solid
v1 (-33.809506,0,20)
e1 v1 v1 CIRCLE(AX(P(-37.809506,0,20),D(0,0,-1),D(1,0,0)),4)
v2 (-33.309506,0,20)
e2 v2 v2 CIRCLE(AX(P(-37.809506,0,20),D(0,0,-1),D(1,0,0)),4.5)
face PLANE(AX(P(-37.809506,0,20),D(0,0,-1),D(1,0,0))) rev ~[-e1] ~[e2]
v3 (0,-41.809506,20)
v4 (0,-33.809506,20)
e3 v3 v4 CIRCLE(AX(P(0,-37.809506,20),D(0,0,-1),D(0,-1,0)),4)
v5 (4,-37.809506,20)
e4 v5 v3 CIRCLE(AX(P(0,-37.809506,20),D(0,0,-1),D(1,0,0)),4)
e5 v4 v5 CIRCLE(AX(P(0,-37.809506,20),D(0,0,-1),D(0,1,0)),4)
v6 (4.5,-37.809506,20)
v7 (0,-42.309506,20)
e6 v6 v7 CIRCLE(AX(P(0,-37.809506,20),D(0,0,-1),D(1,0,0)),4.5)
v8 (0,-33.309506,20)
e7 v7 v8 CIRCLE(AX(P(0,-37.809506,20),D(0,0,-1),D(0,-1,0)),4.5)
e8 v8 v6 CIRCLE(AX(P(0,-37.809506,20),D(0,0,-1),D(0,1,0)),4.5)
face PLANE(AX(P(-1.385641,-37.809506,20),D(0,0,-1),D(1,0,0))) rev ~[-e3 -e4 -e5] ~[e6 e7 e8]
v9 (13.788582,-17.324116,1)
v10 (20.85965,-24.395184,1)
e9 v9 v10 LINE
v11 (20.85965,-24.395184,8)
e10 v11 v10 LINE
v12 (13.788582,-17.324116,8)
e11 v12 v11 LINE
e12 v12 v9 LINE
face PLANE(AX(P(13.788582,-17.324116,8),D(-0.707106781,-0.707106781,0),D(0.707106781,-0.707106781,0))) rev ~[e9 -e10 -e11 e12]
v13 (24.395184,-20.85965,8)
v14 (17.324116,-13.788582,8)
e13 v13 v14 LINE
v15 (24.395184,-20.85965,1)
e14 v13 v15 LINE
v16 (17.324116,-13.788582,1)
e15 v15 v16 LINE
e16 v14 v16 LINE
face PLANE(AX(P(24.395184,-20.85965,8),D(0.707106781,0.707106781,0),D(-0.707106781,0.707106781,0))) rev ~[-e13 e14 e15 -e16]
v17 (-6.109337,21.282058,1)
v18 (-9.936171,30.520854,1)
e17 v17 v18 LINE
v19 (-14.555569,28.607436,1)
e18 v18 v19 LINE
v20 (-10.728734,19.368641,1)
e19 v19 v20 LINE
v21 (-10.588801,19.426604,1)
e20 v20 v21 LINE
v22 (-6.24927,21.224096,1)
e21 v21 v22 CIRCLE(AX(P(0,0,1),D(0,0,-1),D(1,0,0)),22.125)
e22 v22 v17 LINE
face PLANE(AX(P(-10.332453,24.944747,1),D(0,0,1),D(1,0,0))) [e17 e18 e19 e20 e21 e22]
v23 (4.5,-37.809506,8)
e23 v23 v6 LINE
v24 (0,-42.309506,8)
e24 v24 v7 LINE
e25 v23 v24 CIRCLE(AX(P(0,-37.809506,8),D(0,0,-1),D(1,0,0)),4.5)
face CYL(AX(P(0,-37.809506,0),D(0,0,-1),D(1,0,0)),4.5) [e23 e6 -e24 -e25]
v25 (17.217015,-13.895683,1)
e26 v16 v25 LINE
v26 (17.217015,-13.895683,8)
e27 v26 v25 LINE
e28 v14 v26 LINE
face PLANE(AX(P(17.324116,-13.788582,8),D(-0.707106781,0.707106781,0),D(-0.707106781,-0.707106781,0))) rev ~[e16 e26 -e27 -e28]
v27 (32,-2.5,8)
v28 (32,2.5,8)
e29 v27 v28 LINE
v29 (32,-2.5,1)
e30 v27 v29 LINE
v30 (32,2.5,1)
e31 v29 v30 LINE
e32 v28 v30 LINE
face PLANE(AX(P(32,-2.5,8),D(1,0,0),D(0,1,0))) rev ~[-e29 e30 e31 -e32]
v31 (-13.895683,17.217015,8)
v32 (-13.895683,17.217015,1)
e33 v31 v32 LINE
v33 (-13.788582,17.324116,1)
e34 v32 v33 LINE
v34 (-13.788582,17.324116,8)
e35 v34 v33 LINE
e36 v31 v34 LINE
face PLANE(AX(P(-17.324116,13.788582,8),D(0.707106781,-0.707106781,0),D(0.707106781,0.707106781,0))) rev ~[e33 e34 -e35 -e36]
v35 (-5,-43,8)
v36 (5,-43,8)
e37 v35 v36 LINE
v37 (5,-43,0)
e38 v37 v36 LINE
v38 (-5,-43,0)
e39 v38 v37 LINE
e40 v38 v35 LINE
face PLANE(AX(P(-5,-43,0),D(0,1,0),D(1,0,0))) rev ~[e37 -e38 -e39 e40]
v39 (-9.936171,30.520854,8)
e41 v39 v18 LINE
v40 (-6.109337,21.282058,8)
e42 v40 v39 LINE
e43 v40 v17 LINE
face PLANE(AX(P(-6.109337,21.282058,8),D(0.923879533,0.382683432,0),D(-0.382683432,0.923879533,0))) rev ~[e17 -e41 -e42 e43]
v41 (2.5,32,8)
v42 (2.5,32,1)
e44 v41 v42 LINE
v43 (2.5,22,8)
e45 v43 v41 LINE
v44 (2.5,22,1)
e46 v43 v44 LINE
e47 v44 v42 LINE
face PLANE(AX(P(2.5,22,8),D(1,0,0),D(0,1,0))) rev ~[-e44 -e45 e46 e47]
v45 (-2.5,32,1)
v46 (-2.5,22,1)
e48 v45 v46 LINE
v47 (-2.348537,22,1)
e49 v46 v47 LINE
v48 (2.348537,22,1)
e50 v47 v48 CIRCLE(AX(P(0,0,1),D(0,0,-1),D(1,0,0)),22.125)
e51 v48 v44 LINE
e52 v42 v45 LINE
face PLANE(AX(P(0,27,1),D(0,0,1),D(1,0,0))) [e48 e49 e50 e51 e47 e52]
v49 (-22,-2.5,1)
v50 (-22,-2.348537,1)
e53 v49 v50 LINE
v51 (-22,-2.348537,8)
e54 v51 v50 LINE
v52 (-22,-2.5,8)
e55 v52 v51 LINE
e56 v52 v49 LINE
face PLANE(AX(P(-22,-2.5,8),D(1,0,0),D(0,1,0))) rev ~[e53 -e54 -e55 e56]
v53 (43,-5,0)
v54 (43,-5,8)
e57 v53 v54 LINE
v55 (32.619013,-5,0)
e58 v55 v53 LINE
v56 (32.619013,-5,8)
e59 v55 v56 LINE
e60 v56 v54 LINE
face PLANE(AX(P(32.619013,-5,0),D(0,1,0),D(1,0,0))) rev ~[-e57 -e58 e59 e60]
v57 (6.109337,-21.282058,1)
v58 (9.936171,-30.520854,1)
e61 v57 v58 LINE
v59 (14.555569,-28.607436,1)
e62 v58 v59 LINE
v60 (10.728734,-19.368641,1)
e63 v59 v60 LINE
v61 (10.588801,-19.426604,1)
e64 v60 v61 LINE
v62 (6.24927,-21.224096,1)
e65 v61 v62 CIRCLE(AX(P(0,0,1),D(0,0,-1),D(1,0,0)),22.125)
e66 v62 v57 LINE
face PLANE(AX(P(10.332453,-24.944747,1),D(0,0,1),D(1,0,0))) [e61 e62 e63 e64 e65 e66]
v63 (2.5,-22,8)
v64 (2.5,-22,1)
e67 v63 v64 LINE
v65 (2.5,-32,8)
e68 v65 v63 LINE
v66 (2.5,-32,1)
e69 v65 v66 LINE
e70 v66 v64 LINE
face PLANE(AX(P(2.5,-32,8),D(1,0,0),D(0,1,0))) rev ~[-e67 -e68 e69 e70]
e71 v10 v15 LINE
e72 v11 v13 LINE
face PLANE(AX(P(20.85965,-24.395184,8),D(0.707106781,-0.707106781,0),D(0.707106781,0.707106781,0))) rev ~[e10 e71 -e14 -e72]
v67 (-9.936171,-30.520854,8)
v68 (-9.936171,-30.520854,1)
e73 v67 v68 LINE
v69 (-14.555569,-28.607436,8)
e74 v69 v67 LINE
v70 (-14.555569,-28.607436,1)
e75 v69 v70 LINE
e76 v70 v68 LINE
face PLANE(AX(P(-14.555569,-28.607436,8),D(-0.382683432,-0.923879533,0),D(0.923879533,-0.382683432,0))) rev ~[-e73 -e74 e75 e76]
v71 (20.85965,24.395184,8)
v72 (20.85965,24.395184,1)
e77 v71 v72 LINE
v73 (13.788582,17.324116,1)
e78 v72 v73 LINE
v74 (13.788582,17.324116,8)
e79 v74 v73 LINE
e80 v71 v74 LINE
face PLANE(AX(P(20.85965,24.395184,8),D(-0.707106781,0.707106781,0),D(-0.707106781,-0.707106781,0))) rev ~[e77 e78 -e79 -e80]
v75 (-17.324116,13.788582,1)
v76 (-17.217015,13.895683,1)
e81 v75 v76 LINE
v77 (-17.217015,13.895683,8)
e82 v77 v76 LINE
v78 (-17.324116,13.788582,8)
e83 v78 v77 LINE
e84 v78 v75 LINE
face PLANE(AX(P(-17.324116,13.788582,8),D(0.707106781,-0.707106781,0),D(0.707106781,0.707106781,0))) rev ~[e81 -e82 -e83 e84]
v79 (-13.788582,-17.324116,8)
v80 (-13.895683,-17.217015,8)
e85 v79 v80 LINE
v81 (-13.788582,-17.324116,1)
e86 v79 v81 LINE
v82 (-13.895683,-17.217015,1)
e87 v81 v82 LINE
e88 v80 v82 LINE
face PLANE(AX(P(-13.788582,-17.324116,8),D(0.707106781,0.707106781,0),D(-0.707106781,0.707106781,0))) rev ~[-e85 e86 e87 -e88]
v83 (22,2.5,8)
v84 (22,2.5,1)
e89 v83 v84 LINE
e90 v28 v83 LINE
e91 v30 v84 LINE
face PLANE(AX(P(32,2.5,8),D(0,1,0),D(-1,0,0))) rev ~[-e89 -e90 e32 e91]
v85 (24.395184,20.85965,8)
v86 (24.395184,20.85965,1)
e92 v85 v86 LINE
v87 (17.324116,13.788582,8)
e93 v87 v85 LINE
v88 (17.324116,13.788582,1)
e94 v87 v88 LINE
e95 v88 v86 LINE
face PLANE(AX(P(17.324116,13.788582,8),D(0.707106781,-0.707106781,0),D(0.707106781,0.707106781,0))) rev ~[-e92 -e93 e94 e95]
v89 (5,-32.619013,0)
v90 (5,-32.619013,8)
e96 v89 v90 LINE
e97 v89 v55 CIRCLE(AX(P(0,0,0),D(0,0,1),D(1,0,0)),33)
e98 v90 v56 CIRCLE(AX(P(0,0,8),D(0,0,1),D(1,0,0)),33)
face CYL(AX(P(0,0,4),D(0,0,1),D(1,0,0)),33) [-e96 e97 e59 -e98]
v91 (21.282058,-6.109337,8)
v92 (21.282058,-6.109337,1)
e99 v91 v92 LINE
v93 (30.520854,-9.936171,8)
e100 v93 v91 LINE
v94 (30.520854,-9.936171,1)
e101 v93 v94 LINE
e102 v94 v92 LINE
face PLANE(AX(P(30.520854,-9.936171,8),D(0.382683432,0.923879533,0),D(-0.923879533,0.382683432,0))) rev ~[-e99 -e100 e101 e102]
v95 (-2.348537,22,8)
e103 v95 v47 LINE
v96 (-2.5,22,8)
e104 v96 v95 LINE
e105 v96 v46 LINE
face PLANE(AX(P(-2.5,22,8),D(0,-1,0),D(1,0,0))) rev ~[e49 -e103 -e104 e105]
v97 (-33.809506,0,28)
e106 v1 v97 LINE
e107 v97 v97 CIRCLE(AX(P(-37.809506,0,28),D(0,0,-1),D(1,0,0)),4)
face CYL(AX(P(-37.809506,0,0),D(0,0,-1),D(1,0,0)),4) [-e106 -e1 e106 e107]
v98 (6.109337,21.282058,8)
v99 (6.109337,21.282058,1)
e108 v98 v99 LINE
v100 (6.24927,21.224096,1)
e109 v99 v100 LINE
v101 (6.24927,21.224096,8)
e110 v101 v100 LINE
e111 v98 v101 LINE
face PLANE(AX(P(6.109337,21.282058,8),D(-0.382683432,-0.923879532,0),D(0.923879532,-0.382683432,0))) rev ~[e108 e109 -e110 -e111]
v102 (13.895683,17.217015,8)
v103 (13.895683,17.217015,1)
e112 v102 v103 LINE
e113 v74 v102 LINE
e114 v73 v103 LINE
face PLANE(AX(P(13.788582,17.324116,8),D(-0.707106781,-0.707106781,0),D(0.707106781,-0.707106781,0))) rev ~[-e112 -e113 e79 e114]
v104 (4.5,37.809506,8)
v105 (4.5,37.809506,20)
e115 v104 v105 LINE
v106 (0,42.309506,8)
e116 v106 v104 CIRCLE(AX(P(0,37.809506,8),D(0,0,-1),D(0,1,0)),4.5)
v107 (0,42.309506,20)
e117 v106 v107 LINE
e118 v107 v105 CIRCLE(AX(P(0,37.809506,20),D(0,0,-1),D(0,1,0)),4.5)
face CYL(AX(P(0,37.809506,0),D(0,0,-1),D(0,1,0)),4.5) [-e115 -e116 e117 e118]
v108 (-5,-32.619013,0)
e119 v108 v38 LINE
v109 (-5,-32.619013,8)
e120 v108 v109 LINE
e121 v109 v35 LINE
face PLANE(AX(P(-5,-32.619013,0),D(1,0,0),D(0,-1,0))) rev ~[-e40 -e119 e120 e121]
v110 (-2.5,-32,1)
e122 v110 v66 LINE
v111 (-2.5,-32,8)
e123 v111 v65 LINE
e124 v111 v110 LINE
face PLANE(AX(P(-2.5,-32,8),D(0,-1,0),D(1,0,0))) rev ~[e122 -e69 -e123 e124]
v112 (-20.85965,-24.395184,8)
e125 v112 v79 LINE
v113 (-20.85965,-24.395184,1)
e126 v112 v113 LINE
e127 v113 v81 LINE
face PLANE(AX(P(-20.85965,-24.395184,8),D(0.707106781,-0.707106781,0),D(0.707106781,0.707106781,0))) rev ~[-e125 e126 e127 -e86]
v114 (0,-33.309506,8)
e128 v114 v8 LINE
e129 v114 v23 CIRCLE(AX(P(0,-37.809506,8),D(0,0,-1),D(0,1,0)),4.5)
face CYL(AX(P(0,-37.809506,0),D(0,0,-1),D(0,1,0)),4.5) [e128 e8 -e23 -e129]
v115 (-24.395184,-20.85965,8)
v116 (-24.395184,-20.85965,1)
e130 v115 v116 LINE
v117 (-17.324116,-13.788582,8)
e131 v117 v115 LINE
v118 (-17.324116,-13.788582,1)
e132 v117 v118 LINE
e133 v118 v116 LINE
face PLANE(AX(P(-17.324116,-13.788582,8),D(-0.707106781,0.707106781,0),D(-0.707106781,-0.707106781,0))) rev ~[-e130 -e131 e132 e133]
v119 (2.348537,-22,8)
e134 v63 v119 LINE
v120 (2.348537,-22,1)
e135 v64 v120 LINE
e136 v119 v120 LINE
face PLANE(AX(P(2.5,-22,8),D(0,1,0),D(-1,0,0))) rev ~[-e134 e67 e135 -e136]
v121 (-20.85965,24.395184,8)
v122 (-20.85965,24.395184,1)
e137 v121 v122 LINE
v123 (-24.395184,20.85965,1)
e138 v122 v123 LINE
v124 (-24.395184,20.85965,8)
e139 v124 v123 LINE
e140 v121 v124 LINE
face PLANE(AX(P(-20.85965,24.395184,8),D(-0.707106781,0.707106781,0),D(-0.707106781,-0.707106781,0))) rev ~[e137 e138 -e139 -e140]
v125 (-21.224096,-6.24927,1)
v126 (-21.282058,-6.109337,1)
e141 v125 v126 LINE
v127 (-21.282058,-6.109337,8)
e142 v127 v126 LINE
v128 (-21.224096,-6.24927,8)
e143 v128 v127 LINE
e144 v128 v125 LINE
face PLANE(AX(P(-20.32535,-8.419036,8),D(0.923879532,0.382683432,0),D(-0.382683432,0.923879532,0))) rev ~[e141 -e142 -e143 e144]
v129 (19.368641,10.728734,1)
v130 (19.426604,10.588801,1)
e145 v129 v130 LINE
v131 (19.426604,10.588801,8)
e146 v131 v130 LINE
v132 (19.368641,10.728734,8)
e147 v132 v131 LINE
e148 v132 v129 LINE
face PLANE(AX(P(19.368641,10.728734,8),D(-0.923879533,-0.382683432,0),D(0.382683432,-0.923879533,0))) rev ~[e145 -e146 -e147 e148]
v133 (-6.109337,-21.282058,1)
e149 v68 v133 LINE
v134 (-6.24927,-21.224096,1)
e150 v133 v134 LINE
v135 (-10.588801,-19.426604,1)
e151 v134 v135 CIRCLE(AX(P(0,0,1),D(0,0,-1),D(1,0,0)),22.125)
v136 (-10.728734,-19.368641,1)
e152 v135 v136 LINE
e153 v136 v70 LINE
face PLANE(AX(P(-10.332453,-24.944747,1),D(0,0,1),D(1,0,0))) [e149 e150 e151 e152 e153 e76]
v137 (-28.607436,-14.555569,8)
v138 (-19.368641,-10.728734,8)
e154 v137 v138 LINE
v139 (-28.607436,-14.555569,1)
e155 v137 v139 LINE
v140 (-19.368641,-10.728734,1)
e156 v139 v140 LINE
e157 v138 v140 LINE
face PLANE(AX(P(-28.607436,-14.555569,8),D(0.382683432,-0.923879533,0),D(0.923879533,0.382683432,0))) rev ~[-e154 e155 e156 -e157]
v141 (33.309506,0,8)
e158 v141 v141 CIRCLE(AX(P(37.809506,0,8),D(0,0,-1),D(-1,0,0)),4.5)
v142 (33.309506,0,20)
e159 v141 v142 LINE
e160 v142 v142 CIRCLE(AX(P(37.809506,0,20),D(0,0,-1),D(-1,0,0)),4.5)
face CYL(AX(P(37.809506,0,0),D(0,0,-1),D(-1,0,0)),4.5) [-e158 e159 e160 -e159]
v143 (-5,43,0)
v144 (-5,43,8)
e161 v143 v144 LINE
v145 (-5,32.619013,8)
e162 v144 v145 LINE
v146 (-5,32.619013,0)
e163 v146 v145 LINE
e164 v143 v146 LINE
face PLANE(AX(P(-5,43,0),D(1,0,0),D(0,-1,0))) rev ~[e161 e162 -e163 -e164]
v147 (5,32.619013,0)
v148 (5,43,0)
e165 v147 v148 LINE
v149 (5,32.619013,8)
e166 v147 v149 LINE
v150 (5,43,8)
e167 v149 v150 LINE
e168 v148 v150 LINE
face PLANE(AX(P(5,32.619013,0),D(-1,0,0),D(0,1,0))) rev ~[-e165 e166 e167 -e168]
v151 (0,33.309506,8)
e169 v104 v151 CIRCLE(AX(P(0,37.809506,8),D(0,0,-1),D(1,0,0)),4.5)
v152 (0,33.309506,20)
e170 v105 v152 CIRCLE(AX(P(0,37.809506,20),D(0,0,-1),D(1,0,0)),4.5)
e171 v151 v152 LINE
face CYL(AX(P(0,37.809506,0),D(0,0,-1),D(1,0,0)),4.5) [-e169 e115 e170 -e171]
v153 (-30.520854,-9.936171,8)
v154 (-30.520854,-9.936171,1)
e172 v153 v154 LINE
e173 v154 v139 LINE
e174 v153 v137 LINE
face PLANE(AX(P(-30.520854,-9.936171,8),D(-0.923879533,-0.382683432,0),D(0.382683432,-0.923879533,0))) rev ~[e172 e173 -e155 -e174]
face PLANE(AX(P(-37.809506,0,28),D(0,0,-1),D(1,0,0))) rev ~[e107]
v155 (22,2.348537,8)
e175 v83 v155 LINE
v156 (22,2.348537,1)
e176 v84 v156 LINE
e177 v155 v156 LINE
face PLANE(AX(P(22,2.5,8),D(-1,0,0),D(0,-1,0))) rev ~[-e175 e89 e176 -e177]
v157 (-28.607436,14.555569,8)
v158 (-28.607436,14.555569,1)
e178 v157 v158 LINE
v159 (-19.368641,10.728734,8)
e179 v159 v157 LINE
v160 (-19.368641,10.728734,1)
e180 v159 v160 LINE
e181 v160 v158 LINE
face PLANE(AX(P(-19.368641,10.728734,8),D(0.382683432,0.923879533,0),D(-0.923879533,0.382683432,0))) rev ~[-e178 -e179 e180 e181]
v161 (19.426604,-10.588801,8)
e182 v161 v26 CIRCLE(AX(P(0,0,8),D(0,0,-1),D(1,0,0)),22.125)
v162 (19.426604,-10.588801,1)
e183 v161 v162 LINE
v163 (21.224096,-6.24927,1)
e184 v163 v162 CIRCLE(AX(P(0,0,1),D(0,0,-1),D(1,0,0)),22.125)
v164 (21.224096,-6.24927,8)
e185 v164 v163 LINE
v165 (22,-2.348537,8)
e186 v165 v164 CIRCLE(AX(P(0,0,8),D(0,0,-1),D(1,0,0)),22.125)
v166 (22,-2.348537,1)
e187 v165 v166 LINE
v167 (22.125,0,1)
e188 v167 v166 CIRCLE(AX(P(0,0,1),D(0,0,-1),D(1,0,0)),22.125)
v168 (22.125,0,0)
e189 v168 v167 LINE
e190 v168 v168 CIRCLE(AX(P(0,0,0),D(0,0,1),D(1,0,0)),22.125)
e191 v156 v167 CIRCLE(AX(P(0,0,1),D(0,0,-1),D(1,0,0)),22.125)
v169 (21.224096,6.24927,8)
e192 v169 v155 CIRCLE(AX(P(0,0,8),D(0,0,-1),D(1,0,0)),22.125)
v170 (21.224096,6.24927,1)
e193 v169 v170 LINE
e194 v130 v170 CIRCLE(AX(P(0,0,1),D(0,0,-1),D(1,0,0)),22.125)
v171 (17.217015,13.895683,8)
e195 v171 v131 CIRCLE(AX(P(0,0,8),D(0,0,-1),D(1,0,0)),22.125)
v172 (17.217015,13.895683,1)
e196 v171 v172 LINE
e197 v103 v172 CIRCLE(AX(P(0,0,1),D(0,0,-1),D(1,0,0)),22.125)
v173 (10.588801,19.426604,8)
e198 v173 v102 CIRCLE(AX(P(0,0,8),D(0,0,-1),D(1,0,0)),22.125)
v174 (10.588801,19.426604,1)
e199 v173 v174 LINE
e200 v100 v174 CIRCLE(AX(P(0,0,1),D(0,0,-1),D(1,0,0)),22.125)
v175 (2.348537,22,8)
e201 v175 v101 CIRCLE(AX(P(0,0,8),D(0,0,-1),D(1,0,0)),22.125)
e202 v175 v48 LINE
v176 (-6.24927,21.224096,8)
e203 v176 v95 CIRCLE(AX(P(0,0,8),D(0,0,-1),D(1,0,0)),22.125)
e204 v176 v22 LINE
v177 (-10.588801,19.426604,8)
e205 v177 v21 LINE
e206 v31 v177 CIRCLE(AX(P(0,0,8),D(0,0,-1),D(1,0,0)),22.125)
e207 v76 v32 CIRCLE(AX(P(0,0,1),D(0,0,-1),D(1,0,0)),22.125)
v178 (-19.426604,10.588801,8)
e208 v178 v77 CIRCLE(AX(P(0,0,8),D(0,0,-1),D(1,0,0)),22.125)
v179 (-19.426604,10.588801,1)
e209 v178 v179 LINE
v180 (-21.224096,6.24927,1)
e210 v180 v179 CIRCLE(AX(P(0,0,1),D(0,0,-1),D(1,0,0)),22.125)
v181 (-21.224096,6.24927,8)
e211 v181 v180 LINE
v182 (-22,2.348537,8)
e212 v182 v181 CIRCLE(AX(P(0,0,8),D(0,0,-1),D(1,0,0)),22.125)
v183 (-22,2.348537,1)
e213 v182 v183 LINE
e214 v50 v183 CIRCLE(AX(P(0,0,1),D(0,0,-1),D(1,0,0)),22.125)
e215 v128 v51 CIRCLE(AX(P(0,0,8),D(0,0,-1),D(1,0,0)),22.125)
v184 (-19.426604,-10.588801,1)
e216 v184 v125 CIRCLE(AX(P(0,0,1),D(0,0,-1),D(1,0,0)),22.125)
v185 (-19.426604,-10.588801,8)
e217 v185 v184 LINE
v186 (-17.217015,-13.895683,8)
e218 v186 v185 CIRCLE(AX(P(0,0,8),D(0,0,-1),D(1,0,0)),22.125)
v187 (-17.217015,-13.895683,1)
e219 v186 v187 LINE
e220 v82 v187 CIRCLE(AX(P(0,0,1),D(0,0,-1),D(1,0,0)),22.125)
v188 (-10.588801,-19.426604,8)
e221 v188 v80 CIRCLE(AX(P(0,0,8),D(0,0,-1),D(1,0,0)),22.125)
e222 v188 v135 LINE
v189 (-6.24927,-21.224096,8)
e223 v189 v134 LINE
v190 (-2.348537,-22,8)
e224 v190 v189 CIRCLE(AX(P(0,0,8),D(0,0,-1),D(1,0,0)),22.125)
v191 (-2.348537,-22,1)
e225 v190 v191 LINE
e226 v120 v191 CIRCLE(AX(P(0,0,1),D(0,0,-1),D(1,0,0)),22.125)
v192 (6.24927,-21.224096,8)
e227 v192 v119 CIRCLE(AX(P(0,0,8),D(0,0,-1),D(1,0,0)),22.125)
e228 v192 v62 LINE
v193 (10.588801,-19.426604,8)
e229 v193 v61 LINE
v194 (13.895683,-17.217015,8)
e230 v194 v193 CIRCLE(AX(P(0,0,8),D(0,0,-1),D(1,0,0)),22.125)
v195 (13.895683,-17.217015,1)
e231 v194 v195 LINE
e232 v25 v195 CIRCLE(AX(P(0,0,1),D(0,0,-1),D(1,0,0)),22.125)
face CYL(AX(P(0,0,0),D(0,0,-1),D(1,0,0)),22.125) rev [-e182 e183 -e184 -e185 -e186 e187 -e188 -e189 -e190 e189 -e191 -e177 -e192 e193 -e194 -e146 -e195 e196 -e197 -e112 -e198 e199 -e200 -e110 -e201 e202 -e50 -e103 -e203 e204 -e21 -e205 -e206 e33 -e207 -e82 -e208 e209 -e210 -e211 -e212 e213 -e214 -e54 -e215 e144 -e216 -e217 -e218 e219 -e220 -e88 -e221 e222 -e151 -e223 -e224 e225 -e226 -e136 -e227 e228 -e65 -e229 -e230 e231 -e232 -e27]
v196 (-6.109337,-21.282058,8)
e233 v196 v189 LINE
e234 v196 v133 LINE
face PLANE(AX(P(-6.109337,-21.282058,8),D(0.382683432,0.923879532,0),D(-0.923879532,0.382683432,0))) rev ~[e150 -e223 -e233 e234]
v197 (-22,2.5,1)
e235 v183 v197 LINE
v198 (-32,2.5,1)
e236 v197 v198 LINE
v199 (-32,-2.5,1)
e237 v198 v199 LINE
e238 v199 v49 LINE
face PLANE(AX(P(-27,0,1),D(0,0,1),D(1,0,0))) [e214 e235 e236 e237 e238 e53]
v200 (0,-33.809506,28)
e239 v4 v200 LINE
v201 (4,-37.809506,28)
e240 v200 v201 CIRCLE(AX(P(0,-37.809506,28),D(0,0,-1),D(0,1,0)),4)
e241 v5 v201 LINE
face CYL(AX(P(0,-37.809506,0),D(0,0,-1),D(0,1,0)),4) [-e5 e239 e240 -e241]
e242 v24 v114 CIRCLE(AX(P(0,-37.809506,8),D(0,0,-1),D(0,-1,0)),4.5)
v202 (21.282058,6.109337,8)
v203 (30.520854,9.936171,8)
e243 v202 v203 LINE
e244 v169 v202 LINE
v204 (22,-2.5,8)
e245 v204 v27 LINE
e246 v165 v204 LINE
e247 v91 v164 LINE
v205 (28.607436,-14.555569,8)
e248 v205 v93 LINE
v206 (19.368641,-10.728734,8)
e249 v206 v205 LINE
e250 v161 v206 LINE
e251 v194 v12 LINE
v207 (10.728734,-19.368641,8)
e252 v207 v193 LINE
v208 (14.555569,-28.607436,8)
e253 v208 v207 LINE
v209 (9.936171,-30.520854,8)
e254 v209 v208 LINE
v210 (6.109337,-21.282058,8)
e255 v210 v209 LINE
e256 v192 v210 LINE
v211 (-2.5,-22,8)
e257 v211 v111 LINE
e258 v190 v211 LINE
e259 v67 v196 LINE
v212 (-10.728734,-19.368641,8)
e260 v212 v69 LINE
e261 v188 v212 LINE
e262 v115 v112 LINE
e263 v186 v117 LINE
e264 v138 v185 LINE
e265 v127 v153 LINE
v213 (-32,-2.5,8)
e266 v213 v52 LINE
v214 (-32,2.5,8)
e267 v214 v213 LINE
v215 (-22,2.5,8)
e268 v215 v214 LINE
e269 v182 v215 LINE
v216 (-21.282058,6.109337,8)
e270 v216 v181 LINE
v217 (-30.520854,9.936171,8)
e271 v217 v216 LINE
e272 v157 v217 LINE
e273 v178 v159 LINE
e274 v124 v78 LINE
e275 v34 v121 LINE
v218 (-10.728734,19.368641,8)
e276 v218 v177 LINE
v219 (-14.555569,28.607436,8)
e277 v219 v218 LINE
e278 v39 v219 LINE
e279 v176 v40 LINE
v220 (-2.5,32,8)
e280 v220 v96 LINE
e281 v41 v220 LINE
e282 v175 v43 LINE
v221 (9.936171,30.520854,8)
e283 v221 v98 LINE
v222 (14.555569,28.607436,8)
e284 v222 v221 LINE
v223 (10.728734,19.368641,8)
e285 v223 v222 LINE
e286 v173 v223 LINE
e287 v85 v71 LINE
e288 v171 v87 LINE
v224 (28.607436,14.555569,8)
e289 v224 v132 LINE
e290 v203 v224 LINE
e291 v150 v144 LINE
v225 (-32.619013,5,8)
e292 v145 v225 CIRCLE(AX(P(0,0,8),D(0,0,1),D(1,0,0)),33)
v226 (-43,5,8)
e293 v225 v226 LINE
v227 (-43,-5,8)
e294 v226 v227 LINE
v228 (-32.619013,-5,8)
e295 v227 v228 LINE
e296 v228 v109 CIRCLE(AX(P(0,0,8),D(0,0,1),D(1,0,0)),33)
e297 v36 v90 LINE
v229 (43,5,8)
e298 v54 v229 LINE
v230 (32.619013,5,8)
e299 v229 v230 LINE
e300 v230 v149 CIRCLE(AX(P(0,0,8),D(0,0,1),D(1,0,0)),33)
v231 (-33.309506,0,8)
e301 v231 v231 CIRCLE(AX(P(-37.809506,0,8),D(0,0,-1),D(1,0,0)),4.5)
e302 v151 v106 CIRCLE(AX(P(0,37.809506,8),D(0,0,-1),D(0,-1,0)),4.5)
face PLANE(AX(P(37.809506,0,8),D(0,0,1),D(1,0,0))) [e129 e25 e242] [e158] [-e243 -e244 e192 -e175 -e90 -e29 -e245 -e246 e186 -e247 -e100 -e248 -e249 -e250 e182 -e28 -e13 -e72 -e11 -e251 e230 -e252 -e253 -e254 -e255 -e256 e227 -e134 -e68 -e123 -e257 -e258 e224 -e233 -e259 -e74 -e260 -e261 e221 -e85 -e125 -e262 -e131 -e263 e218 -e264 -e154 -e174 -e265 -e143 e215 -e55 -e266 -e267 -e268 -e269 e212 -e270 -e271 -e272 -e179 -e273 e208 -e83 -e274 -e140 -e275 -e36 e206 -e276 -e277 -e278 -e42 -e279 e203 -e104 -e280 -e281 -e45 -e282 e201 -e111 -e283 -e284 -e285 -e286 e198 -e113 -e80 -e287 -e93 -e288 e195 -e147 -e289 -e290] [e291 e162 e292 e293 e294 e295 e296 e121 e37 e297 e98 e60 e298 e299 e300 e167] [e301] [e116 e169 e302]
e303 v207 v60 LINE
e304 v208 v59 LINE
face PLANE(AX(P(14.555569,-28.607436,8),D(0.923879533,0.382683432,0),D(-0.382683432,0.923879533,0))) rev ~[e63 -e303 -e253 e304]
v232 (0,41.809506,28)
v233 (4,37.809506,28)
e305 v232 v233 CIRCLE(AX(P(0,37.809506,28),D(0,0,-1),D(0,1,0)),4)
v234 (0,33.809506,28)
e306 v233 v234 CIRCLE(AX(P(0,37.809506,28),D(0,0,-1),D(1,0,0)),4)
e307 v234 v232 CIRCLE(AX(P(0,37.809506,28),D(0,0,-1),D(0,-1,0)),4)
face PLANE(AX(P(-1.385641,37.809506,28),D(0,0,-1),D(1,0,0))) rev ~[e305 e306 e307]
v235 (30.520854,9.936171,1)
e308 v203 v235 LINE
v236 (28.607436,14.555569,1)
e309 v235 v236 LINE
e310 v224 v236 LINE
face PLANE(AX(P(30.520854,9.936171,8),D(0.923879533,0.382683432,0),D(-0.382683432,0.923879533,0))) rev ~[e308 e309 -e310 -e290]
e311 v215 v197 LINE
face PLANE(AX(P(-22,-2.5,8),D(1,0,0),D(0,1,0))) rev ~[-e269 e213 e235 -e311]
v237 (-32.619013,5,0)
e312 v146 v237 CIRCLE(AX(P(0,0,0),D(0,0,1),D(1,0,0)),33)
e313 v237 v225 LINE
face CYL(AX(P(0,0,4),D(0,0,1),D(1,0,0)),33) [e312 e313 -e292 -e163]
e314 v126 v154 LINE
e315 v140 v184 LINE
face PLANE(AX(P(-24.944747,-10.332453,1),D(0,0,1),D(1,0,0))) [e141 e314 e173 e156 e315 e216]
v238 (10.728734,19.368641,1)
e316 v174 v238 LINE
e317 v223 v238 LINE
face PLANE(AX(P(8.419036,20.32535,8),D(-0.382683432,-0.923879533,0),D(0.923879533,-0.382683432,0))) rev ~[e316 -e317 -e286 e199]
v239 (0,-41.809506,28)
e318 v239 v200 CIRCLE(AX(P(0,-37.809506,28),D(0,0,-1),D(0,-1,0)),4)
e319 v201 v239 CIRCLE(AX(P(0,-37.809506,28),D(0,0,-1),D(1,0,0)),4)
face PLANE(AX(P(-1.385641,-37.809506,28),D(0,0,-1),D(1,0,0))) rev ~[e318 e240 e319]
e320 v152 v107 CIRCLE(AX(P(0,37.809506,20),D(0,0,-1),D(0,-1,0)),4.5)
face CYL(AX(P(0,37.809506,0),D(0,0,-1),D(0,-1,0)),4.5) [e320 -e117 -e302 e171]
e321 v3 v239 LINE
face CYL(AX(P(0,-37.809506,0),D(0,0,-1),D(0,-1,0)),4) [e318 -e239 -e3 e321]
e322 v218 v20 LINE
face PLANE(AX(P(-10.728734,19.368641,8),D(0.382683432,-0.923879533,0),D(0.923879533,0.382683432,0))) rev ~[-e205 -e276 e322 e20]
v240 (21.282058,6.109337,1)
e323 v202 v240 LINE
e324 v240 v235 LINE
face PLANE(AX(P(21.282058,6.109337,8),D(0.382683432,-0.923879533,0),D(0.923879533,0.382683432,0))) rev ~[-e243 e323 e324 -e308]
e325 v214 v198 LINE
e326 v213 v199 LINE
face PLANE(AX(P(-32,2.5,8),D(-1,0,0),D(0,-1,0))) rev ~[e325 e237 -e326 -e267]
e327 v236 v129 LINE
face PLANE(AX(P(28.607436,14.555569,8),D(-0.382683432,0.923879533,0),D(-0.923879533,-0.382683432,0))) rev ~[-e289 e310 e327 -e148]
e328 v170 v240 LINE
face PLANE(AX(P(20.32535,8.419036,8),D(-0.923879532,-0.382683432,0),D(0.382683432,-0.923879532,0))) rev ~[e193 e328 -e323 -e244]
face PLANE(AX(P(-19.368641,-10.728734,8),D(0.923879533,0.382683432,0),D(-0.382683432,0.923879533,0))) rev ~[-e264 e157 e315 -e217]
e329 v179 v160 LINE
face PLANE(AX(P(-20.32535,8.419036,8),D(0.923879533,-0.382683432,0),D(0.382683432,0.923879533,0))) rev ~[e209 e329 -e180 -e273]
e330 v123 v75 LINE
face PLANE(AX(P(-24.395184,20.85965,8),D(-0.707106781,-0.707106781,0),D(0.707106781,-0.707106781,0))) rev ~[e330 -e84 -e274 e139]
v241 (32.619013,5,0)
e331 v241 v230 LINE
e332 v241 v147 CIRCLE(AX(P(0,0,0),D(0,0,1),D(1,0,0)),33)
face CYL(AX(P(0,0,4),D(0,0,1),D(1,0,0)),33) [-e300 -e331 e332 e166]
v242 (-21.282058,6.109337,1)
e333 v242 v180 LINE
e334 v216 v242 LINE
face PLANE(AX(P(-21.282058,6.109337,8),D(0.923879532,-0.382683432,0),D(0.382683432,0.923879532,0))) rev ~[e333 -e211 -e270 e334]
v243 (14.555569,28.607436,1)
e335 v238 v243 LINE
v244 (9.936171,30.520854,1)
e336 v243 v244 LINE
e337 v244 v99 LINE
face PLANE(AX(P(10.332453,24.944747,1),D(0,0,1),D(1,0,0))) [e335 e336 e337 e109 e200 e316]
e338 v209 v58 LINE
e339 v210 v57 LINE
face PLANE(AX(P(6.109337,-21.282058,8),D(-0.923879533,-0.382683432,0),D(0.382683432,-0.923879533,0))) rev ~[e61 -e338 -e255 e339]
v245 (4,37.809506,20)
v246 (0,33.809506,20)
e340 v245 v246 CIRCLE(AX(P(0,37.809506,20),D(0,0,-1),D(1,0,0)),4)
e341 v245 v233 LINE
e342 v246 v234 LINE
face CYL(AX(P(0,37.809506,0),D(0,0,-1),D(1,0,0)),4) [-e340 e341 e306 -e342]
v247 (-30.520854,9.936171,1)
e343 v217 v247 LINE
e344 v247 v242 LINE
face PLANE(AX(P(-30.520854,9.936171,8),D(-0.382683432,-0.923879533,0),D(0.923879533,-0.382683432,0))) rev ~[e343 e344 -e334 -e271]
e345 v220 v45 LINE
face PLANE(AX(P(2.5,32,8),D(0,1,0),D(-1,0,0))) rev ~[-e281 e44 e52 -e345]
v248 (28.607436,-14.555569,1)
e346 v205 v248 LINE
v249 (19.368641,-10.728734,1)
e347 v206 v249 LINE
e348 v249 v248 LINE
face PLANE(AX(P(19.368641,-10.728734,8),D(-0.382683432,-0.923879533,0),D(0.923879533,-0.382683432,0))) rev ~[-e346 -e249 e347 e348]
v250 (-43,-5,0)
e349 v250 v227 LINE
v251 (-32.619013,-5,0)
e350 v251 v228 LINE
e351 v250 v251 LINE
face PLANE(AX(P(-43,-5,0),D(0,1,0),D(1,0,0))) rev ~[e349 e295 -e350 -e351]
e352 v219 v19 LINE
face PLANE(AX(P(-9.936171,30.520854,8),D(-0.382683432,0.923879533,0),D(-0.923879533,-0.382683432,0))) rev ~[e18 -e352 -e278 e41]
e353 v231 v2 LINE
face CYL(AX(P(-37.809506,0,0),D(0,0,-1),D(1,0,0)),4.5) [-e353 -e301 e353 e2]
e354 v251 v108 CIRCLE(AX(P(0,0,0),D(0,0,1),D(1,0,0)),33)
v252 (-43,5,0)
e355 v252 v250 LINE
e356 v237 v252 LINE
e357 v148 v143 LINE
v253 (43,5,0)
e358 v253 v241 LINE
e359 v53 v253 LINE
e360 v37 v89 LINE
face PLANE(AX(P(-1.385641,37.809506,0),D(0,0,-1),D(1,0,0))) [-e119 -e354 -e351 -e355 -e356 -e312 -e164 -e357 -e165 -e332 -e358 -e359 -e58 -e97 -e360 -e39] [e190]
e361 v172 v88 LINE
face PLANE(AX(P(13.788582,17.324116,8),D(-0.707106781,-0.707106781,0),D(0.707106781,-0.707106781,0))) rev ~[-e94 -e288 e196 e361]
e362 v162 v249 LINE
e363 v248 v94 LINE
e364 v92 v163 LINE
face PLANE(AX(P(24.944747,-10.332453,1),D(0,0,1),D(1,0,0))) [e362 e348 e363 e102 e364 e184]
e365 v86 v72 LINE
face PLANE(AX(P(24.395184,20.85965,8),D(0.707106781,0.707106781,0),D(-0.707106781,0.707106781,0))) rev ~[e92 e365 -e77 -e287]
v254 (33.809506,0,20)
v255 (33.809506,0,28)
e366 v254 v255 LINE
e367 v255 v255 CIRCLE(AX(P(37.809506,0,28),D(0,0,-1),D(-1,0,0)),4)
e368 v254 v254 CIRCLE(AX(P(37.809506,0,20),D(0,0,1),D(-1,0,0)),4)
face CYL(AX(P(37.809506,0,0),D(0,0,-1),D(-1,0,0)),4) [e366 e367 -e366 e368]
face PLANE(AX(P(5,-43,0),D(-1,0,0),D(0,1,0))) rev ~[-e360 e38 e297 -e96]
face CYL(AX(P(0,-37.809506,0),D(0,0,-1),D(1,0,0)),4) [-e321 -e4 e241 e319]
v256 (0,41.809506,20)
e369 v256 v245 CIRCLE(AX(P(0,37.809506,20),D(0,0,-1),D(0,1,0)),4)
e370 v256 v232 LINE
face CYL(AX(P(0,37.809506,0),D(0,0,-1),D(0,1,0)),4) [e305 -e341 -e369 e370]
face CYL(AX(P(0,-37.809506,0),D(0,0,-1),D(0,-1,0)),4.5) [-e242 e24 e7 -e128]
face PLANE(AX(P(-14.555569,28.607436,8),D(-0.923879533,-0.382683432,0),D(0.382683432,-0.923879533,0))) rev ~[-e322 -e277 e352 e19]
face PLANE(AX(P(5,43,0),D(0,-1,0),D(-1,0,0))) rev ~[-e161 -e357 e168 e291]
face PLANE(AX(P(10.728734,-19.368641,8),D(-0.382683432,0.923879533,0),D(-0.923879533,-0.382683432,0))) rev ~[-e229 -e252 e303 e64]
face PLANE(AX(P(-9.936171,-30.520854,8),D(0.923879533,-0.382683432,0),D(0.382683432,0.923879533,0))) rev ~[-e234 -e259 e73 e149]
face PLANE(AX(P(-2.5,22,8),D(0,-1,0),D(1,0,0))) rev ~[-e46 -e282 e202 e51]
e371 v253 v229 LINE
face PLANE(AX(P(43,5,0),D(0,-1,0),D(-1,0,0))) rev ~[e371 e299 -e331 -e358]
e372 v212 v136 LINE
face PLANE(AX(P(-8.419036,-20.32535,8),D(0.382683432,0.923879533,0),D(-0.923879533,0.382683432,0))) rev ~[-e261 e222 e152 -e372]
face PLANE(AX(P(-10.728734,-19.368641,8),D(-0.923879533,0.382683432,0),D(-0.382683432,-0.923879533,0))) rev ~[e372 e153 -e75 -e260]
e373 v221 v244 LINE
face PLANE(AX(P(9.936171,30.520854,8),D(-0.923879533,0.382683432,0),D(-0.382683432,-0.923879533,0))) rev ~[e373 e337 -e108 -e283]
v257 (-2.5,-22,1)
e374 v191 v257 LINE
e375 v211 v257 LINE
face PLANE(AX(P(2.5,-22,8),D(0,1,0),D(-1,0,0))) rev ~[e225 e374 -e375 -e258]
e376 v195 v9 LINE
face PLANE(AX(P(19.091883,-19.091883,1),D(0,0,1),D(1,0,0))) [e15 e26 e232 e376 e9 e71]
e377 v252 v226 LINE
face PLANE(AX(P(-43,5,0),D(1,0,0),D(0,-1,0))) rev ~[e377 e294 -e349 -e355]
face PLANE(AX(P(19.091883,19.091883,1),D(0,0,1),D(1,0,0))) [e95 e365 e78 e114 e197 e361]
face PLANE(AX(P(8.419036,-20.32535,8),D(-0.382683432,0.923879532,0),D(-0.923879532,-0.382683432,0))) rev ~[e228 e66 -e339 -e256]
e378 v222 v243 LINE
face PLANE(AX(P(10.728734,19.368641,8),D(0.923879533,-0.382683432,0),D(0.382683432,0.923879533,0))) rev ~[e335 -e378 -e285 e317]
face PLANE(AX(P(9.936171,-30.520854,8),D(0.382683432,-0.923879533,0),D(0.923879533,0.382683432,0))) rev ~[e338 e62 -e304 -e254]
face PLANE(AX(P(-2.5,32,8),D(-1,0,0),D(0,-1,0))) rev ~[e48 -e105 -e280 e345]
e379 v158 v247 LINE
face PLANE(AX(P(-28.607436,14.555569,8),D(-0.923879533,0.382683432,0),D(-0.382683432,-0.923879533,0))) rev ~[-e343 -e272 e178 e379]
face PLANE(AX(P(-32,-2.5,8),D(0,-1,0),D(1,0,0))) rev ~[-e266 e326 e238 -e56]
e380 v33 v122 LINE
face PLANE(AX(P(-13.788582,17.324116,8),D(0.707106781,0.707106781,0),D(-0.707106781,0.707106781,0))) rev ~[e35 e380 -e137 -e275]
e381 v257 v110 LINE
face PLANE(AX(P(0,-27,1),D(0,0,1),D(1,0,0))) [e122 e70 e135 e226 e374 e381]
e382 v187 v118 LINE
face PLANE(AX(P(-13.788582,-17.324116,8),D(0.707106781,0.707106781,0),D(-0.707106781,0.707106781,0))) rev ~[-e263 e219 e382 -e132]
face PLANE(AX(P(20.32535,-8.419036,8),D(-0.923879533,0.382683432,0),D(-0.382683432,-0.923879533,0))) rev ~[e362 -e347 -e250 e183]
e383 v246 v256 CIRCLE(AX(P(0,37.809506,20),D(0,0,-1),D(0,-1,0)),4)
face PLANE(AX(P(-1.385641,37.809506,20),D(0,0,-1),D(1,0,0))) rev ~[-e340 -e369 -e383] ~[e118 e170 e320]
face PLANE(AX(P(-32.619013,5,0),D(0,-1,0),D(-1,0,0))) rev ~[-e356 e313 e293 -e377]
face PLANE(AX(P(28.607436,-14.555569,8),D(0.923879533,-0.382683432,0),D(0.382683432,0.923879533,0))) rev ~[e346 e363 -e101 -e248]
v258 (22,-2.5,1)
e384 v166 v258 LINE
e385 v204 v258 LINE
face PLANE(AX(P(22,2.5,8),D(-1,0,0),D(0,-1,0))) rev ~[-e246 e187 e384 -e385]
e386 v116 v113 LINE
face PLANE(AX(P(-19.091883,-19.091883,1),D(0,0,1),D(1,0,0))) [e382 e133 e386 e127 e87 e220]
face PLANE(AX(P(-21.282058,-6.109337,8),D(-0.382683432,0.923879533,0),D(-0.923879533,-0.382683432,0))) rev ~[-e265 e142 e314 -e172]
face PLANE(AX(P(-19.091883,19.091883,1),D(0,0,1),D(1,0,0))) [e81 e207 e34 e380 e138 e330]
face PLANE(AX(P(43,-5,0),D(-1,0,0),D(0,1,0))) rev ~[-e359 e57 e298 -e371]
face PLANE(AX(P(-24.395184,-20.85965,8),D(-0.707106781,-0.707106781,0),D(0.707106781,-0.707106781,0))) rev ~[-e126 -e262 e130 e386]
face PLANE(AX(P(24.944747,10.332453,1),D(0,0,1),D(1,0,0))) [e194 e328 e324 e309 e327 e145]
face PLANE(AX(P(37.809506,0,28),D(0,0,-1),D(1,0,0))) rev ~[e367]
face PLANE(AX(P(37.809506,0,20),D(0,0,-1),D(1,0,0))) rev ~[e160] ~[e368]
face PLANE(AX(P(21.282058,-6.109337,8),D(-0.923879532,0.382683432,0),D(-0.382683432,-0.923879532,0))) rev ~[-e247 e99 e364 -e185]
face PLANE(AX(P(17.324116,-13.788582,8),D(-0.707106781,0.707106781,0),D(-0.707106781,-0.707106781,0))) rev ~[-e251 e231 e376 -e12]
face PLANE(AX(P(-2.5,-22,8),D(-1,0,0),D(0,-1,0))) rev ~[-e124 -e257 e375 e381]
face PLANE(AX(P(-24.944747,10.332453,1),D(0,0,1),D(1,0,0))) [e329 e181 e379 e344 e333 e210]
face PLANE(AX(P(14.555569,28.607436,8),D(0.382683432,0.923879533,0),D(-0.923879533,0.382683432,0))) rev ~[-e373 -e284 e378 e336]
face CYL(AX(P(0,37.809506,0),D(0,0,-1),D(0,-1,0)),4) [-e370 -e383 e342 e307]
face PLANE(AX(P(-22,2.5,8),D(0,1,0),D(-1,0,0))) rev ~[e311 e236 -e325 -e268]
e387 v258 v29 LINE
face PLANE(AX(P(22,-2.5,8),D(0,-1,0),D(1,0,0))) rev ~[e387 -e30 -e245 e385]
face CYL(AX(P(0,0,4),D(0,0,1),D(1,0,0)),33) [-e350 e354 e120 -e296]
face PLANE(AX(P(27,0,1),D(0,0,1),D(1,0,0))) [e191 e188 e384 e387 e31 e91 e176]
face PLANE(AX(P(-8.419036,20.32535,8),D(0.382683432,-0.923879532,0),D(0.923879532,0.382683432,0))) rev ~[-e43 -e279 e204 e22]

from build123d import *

# Parameters (mm, degrees)
F0_W      = 33
F0_H      = 8
F2_R      = 22.125
F3_DEPTH  = 25
F5_DEPTH  = 7
F7_DEPTH  = 8
F8_R      = 4
F9_DEPTH  = 25
F10_R     = 4.5
F10_R_2   = 4
F11_DEPTH = 20
F12_DEPTH = 28


with BuildPart() as f1:
    # F0 (on Front) → F1 (revolve)
    with BuildSketch(Plane.XZ):
        with Locations((16.5, 4)):
            Rectangle(F0_W, F0_H)
    revolve(axis=Axis((0, 0, 4), (0, 0, 1)))

    # F2 (on Top) → F3 (cut)
    with BuildSketch(Plane.XY):
        Circle(F2_R)
    extrude(amount=F3_DEPTH, mode=Mode.SUBTRACT)

    # F4 (on face) → F5 (cut)
    with BuildSketch(Plane.XY.offset(8)):
        Polygon((-2.5, 22), (0, 22), (2.5, 22), (2.5, 32), (-2.5, 32), align=None)
        Polygon((-14.555568667, 28.6074364594), (-10.7287343433, 19.3686411343), (-8.419035512, 20.3253497152), (-6.1093366808, 21.2820582962), (-9.9361710044, 30.5208536213), align=None)
        Polygon((-24.3951839509, 20.859650045), (-17.3241161391, 13.7885822331), (-15.5563491861, 15.5563491861), (-13.7885822331, 17.3241161391), (-20.859650045, 24.3951839509), align=None)
        Polygon((-30.5208536213, 9.9361710044), (-21.2820582962, 6.1093366808), (-20.3253497152, 8.419035512), (-19.3686411343, 10.7287343433), (-28.6074364594, 14.555568667), align=None)
        Polygon((-32, -2.5), (-22, -2.5), (-22, 0), (-22, 2.5), (-32, 2.5), align=None)
        Polygon((-28.6074364594, -14.555568667), (-19.3686411343, -10.7287343433), (-20.3253497152, -8.419035512), (-21.2820582962, -6.1093366808), (-30.5208536213, -9.9361710044), align=None)
        Polygon((-20.859650045, -24.3951839509), (-13.7885822331, -17.3241161391), (-15.5563491861, -15.5563491861), (-17.3241161391, -13.7885822331), (-24.3951839509, -20.859650045), align=None)
        Polygon((-9.9361710044, -30.5208536213), (-6.1093366808, -21.2820582962), (-8.419035512, -20.3253497152), (-10.7287343433, -19.3686411343), (-14.555568667, -28.6074364594), align=None)
        Polygon((2.5, -32), (2.5, -22), (0, -22), (-2.5, -22), (-2.5, -32), align=None)
        Polygon((14.555568667, -28.6074364594), (10.7287343433, -19.3686411343), (8.419035512, -20.3253497152), (6.1093366808, -21.2820582962), (9.9361710044, -30.5208536213), align=None)
        Polygon((24.3951839509, -20.859650045), (17.3241161391, -13.7885822331), (15.5563491861, -15.5563491861), (13.7885822331, -17.3241161391), (20.859650045, -24.3951839509), align=None)
        Polygon((30.5208536213, -9.9361710044), (21.2820582962, -6.1093366808), (20.3253497152, -8.419035512), (19.3686411343, -10.7287343433), (28.6074364594, -14.555568667), align=None)
        Polygon((32, 2.5), (22, 2.5), (22, 0), (22, -2.5), (32, -2.5), align=None)
        Polygon((28.6074364594, 14.555568667), (19.3686411343, 10.7287343433), (20.3253497152, 8.419035512), (21.2820582962, 6.1093366808), (30.5208536213, 9.9361710044), align=None)
        Polygon((20.859650045, 24.3951839509), (13.7885822331, 17.3241161391), (15.5563491861, 15.5563491861), (17.3241161391, 13.7885822331), (24.3951839509, 20.859650045), align=None)
        Polygon((9.9361710044, 30.5208536213), (6.1093366808, 21.2820582962), (8.419035512, 20.3253497152), (10.7287343433, 19.3686411343), (14.555568667, 28.6074364594), align=None)
    extrude(amount=-F5_DEPTH, mode=Mode.SUBTRACT)

    # F6 (on Top) → F7 (join)
    with BuildSketch(Plane.XY):
        Polygon((43, -5), (43, 0), (43, 5), (32.6190128606, 5), (32.6190128606, -5), align=None)
        Polygon((5, 32.6190128606), (5, 43), (0, 43), (-5, 43), (-5, 32.6190128606), align=None)
        Polygon((-32.6190128606, 5), (-43, 5), (-43, 0), (-43, -5), (-32.6190128606, -5), align=None)
        Polygon((-5, -32.6190128606), (-5, -43), (0, -43), (5, -43), (5, -32.6190128606), align=None)
    extrude(amount=F7_DEPTH)

    # F8 (on face) → F9 (cut)
    with BuildSketch(Plane.XY.offset(8)):
        with Locations((0, 37.8095064303)):
            Circle(F8_R)
        with Locations((37.8095064303, 0)):
            Circle(F8_R)
        with Locations((-37.8095064303, 0)):
            Circle(F8_R)
        with Locations((0, -37.8095064303)):
            Circle(F8_R)
    extrude(amount=-F9_DEPTH, mode=Mode.SUBTRACT)

    # F10 (on face) → F11 (join)
    with BuildSketch(Plane(origin=(0, 0, 0), x_dir=(1, 0, 0), z_dir=(0, 0, -1))):
        with BuildLine():
            Line((0, -41.8095064303), (0, -37.8095064303))
            Line((0, -37.8095064303), (0, -33.8095064303))
            ThreePointArc((0, -33.8095064303), (-4, -37.8095064303), (0, -41.8095064303))
        make_face()
        with BuildLine():
            Line((0, -33.8095064303), (0, -37.8095064303))
            Line((0, -37.8095064303), (0, -41.8095064303))
            ThreePointArc((0, -41.8095064303), (2.8284271247, -40.637933555), (4, -37.8095064303))
            ThreePointArc((4, -37.8095064303), (2.8284271247, -34.9810793056), (0, -33.8095064303))
        make_face()
        with BuildLine():
            ThreePointArc((42.3095064303, 0), (37.8095064303, 4.5), (33.3095064303, 0))
            ThreePointArc((33.3095064303, 0), (37.8095064303, -4.5), (42.3095064303, 0))
        make_face()
        with BuildLine():
            ThreePointArc((41.8095064303, 0), (37.8095064303, -4), (33.8095064303, 0))
            ThreePointArc((33.8095064303, 0), (37.8095064303, 4), (41.8095064303, 0))
        make_face(mode=Mode.SUBTRACT)
        with BuildLine():
            ThreePointArc((0, 41.8095064303), (-4, 37.8095064303), (0, 33.8095064303))
            Line((0, 33.8095064303), (0, 37.8095064303))
            Line((0, 37.8095064303), (0, 41.8095064303))
        make_face()
        with BuildLine():
            Line((0, 37.8095064303), (0, 33.8095064303))
            ThreePointArc((0, 33.8095064303), (2.8284271247, 34.9810793056), (4, 37.8095064303))
            ThreePointArc((4, 37.8095064303), (2.8284271247, 40.637933555), (0, 41.8095064303))
            Line((0, 41.8095064303), (0, 37.8095064303))
        make_face()
        with BuildLine():
            Line((0, -33.3095064303), (0, -33.8095064303))
            ThreePointArc((0, -33.8095064303), (2.8284271247, -34.9810793056), (4, -37.8095064303))
            ThreePointArc((4, -37.8095064303), (2.8284271247, -40.637933555), (0, -41.8095064303))
            Line((0, -41.8095064303), (0, -42.3095064303))
            ThreePointArc((0, -42.3095064303), (3.1819805153, -40.9914869456), (4.5, -37.8095064303))
            ThreePointArc((4.5, -37.8095064303), (3.1819805153, -34.627525915), (0, -33.3095064303))
        make_face()
        with BuildLine():
            ThreePointArc((0, -41.8095064303), (-4, -37.8095064303), (0, -33.8095064303))
            Line((0, -33.8095064303), (0, -33.3095064303))
            ThreePointArc((0, -33.3095064303), (-4.5, -37.8095064303), (0, -42.3095064303))
            Line((0, -42.3095064303), (0, -41.8095064303))
        make_face()
        with Locations((-37.8095064303, 0)):
            Circle(F10_R)
        with Locations((-37.8095064303, 0)):
            Circle(F10_R_2, mode=Mode.SUBTRACT)
        with BuildLine():
            ThreePointArc((0, 42.3095064303), (-4.5, 37.8095064303), (0, 33.3095064303))
            Line((0, 33.3095064303), (0, 33.8095064303))
            ThreePointArc((0, 33.8095064303), (-4, 37.8095064303), (0, 41.8095064303))
            Line((0, 41.8095064303), (0, 42.3095064303))
        make_face()
        with BuildLine():
            Line((0, 33.8095064303), (0, 33.3095064303))
            ThreePointArc((0, 33.3095064303), (3.1819805153, 34.627525915), (4.5, 37.8095064303))
            ThreePointArc((4.5, 37.8095064303), (3.1819805153, 40.9914869456), (0, 42.3095064303))
            Line((0, 42.3095064303), (0, 41.8095064303))
            ThreePointArc((0, 41.8095064303), (2.8284271247, 40.637933555), (4, 37.8095064303))
            ThreePointArc((4, 37.8095064303), (2.8284271247, 34.9810793056), (0, 33.8095064303))
        make_face()
    extrude(amount=-F11_DEPTH)

    # F10 (on face) → F12 (join)
    with BuildSketch(Plane(origin=(0, 0, 0), x_dir=(1, 0, 0), z_dir=(0, 0, -1))):
        with BuildLine():
            Line((0, -41.8095064303), (0, -37.8095064303))
            Line((0, -37.8095064303), (0, -33.8095064303))
            ThreePointArc((0, -33.8095064303), (-4, -37.8095064303), (0, -41.8095064303))
        make_face()
        with BuildLine():
            Line((0, -33.8095064303), (0, -37.8095064303))
            Line((0, -37.8095064303), (0, -41.8095064303))
            ThreePointArc((0, -41.8095064303), (2.8284271247, -40.637933555), (4, -37.8095064303))
            ThreePointArc((4, -37.8095064303), (2.8284271247, -34.9810793056), (0, -33.8095064303))
        make_face()
        with Locations((-37.8095064303, 0)):
            Circle(F10_R_2)
        with BuildLine():
            ThreePointArc((41.8095064303, 0), (37.8095064303, 4), (33.8095064303, 0))
            ThreePointArc((33.8095064303, 0), (37.8095064303, -4), (41.8095064303, 0))
        make_face()
        with BuildLine():
            ThreePointArc((0, 41.8095064303), (-4, 37.8095064303), (0, 33.8095064303))
            Line((0, 33.8095064303), (0, 37.8095064303))
            Line((0, 37.8095064303), (0, 41.8095064303))
        make_face()
        with BuildLine():
            Line((0, 37.8095064303), (0, 33.8095064303))
            ThreePointArc((0, 33.8095064303), (2.8284271247, 34.9810793056), (4, 37.8095064303))
            ThreePointArc((4, 37.8095064303), (2.8284271247, 40.637933555), (0, 41.8095064303))
            Line((0, 41.8095064303), (0, 37.8095064303))
        make_face()
    extrude(amount=-F12_DEPTH)


solid = f1.part
